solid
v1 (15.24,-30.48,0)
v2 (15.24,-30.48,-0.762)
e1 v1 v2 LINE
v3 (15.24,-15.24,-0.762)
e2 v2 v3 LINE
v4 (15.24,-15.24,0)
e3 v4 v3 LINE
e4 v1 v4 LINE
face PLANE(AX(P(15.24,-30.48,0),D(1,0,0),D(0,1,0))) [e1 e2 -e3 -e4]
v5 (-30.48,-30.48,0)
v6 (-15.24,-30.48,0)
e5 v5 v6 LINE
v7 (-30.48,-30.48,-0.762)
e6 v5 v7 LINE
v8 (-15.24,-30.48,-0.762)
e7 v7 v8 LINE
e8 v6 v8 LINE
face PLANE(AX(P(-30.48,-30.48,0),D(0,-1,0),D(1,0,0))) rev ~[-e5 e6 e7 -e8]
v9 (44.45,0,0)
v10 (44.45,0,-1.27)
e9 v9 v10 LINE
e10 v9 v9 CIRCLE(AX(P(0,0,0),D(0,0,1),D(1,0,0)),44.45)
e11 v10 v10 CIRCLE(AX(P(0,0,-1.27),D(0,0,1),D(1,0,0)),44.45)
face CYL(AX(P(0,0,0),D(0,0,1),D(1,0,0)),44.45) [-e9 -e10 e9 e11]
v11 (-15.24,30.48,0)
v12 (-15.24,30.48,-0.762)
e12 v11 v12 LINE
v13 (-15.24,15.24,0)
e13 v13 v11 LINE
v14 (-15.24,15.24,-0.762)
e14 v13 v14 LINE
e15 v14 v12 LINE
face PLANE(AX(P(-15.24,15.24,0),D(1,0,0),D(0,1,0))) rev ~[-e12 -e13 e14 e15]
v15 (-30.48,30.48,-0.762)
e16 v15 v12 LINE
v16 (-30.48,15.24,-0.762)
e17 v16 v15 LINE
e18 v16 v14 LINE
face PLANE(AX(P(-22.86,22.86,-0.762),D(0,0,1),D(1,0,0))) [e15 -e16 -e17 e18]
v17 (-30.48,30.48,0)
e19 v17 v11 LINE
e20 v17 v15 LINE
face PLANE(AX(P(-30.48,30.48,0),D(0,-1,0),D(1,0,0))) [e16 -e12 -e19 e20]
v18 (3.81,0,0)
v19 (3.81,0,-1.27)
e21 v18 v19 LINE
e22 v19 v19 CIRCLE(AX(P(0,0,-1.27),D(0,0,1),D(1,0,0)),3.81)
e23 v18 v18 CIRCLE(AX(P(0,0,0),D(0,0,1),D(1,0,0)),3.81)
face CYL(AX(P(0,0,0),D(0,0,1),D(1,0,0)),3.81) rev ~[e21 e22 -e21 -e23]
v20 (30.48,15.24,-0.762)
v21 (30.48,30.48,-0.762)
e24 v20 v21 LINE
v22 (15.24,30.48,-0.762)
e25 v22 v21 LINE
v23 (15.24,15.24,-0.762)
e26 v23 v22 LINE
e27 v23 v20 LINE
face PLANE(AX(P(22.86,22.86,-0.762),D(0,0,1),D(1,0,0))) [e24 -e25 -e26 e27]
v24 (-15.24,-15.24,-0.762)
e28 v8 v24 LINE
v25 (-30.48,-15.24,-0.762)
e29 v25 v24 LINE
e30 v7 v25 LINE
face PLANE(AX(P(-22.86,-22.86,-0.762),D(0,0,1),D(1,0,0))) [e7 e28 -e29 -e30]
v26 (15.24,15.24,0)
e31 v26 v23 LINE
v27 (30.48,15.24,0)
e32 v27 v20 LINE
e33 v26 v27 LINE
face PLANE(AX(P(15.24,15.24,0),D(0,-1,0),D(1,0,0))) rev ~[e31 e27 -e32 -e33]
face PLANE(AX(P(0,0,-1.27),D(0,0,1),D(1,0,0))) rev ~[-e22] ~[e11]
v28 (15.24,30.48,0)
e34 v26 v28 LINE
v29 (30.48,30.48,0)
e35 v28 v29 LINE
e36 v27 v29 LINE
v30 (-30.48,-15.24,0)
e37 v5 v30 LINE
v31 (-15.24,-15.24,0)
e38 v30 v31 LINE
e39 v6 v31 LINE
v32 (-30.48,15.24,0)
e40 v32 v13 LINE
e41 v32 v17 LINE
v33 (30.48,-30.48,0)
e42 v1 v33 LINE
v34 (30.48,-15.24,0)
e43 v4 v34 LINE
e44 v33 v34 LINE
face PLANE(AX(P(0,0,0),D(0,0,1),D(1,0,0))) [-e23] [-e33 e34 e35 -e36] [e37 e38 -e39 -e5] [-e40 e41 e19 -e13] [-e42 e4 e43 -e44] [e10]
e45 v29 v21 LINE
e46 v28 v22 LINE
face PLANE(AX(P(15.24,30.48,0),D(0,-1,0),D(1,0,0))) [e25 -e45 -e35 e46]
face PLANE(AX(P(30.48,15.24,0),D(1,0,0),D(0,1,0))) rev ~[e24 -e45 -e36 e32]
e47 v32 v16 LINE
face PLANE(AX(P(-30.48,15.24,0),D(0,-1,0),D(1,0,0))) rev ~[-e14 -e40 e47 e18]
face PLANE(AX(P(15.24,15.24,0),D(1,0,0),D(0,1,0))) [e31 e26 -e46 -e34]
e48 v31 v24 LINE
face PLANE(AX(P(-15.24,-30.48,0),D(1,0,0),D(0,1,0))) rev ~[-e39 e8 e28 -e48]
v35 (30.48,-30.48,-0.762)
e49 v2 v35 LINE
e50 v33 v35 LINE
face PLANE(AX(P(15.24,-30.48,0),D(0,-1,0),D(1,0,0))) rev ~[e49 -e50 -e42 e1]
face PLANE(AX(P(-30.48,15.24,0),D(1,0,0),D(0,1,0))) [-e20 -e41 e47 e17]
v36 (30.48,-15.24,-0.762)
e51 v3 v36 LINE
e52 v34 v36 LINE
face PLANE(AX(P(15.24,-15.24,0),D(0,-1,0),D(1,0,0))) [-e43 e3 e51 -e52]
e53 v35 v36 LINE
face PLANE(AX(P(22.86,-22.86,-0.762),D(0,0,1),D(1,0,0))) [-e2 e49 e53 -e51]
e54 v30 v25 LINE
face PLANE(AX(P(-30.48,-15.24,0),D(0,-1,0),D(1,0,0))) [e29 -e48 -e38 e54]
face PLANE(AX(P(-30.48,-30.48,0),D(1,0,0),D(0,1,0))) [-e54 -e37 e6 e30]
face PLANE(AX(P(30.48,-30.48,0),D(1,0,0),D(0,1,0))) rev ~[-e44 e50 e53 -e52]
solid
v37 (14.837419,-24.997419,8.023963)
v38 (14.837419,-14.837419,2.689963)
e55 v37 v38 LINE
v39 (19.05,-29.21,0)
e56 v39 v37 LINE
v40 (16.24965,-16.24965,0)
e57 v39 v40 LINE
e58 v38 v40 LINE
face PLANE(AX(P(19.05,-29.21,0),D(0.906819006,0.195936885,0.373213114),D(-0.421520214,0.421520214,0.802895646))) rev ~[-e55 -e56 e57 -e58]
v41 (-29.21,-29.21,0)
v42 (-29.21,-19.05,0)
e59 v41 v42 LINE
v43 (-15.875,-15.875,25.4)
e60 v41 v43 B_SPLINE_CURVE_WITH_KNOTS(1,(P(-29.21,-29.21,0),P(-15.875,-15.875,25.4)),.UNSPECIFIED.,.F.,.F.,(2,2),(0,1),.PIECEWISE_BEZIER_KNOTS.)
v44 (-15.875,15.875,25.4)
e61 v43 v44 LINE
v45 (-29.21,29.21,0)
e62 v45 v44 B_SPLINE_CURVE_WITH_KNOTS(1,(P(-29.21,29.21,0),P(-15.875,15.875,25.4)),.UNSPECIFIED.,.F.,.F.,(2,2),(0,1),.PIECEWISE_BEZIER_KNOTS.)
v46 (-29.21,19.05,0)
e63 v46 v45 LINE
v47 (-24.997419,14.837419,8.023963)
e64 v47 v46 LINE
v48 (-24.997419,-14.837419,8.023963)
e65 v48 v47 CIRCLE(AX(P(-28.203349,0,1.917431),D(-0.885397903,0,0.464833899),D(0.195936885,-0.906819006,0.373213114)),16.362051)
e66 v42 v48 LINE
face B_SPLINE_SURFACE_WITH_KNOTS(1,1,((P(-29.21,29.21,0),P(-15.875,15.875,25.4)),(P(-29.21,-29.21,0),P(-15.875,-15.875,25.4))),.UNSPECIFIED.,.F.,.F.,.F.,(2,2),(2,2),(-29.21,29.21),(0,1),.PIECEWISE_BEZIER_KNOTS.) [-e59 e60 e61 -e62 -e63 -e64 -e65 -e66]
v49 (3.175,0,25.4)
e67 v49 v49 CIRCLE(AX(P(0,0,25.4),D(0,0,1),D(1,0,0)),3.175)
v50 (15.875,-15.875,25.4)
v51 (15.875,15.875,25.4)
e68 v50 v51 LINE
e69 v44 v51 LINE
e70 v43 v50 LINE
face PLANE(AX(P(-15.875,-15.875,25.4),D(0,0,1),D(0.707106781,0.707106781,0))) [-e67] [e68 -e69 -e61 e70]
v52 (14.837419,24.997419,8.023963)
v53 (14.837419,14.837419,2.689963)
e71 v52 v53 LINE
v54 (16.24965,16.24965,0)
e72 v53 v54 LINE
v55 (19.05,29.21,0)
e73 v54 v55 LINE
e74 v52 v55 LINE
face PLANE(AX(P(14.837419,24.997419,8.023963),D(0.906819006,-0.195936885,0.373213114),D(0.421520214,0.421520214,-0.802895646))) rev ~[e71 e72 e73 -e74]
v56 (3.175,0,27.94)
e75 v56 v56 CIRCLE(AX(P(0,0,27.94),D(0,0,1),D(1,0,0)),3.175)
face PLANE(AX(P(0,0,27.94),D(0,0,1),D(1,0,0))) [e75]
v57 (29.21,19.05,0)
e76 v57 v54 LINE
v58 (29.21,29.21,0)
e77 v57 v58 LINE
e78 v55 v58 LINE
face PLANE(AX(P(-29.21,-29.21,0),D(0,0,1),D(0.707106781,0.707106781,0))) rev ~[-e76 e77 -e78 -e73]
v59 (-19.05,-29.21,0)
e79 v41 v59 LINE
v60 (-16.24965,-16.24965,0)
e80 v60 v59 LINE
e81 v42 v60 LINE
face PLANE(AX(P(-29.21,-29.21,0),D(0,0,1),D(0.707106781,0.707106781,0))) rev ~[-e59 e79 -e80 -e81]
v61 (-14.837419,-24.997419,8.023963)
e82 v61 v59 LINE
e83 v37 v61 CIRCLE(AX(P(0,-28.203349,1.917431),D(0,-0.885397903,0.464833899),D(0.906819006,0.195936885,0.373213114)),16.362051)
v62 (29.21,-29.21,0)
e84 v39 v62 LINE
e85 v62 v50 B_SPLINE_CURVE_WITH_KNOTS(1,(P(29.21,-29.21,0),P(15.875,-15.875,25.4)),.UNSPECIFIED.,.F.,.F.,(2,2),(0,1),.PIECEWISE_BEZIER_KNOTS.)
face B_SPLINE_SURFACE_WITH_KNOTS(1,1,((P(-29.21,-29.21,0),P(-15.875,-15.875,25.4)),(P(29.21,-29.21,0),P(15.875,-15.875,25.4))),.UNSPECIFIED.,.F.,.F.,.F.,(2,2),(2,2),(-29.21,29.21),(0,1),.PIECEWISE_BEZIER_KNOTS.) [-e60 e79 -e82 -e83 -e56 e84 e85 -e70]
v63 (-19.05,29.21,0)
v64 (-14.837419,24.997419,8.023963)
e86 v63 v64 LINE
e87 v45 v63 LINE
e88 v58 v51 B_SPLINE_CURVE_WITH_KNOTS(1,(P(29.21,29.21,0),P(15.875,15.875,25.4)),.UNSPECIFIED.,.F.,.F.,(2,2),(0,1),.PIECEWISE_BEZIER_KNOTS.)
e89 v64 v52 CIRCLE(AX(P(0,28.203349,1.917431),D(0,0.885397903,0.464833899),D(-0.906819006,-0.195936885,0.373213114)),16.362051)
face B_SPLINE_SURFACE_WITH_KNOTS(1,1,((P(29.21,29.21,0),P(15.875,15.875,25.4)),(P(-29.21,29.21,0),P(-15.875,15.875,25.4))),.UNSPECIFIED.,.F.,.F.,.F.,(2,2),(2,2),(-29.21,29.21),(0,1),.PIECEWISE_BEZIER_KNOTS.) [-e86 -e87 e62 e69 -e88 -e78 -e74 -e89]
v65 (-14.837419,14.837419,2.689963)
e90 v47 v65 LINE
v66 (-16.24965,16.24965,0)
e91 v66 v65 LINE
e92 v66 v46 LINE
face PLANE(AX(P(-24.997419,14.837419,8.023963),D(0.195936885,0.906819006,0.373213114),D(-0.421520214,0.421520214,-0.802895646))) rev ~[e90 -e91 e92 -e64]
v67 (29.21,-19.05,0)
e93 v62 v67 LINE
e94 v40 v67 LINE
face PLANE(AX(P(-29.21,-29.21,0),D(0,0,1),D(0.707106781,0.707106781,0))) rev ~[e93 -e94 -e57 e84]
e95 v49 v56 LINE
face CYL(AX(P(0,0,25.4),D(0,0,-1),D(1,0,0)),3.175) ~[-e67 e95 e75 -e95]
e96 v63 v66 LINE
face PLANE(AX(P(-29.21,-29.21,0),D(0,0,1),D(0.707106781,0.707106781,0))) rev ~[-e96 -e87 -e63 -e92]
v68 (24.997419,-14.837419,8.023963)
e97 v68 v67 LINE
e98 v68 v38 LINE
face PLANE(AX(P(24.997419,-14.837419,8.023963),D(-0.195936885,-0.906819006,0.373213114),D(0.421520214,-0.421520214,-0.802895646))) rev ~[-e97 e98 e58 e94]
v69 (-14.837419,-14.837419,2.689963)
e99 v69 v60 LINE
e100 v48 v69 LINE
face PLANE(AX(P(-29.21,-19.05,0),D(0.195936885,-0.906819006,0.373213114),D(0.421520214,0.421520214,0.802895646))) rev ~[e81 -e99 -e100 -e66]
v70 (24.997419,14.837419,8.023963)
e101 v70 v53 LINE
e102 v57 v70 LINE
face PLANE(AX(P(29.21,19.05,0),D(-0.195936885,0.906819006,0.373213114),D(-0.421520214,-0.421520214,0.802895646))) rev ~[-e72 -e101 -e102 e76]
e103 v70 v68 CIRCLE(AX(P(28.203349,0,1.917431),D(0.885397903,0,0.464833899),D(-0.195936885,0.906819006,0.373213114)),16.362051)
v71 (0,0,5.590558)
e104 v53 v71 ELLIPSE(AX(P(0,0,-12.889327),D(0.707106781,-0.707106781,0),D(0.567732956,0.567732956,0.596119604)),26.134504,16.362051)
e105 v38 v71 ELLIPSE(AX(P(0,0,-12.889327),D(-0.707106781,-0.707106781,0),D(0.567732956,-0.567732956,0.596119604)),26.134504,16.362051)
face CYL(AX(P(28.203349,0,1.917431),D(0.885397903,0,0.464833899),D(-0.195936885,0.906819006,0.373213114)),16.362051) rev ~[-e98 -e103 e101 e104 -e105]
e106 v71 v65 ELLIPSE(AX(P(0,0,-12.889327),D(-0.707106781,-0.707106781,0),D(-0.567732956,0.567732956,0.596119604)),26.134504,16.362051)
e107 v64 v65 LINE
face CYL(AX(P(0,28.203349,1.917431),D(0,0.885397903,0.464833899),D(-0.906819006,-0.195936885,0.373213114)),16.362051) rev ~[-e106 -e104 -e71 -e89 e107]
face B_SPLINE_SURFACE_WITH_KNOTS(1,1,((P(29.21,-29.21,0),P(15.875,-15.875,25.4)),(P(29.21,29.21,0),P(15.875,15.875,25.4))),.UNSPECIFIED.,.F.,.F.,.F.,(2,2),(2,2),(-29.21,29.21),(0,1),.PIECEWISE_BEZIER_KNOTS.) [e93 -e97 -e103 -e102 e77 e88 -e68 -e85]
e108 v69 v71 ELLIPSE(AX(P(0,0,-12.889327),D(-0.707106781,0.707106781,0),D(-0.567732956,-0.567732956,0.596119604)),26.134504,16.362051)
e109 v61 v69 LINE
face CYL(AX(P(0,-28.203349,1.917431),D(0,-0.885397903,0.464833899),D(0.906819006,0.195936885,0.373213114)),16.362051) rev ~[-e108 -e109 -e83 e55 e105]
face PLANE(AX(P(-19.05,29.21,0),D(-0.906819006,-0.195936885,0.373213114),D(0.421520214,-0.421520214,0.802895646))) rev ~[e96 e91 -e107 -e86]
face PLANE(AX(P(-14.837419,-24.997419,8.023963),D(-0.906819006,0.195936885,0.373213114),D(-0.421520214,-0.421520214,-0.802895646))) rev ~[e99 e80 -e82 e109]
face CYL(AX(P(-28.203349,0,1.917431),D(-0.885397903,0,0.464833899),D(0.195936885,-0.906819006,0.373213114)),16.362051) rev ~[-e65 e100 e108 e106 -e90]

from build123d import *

# Parameters (mm, degrees)
F0_R      = 44.45
F0_R_2    = 3.81
F1_DEPTH  = 1.27
F2_W      = 58.42
F2_H      = 58.42
F4_W      = 31.75
F4_H      = 31.75
F10_DEPTH = 141.478
F11_DEPTH = 70.866
F12_DEPTH = 64.516
F13_DEPTH = 65.278
F14_W     = 15.24
F14_H     = 15.24
F15_DEPTH = 0.762
F16_R     = 3.175
F17_DEPTH = 2.54


with BuildPart() as f1:
    # F0 (on Top) → F1 (new body)
    with BuildSketch(Plane.XY):
        Circle(F0_R)
        Circle(F0_R_2, mode=Mode.SUBTRACT)
    extrude(amount=-F1_DEPTH)

    # F14 (on face) → F15 (cut)
    with BuildSketch(Plane.XY):
        with Locations((-22.86, 22.86)):
            Rectangle(F14_W, F14_H)
        with Locations((22.86, 22.86)):
            Rectangle(F14_W, F14_H)
        with Locations((22.86, -22.86)):
            Rectangle(F14_W, F14_H)
        with Locations((-22.86, -22.86)):
            Rectangle(F14_W, F14_H)
    extrude(amount=-F15_DEPTH, mode=Mode.SUBTRACT)


with BuildPart() as f5:
    # F2 (on Top) → F5 section 0
    with BuildSketch(Plane.XY):
        Rectangle(F2_W, F2_H)
    # F4 (on offset) → F5 section 1
    with BuildSketch(Plane.XY.offset(25.4)):
        Rectangle(F4_W, F4_H)
    loft()

    # F7 (on face) → F10 (cut)
    with BuildSketch(Plane(origin=(-22.8985791279, 0, 12.0217540421), x_dir=(0, -1, 0), z_dir=(-0.8853979028, 0, 0.464833899))):
        with BuildLine():
            Line((-19.05, -13.5777981895), (19.05, -13.5777981895))
            Line((19.05, -13.5777981895), (14.8374191851, -4.5152474072))
            ThreePointArc((14.8374191851, -4.5152474072), (0, 4.9498685856), (-14.8374191851, -4.5152474072))
            Line((-14.8374191851, -4.5152474072), (-19.05, -13.5777981895))
        make_face()
    extrude(amount=-F10_DEPTH, mode=Mode.SUBTRACT)

    # F8 (on face) → F11 (cut)
    with BuildSketch(Plane(origin=(0, -22.8985791279, 12.0217540421), x_dir=(1, 0, 0), z_dir=(0, -0.8853979028, 0.464833899))):
        with BuildLine():
            Line((-14.8374191851, -4.5152474072), (-19.05, -13.5777981895))
            Line((-19.05, -13.5777981895), (19.05, -13.5777981895))
            Line((19.05, -13.5777981895), (14.8374191851, -4.5152474072))
            ThreePointArc((14.8374191851, -4.5152474072), (0, 4.9498685856), (-14.8374191851, -4.5152474072))
        make_face()
    extrude(amount=-F11_DEPTH, mode=Mode.SUBTRACT)

    # F9 (on face) → F12 (cut)
    with BuildSketch(Plane(origin=(22.8985791279, 0, 12.0217540421), x_dir=(0, 1, 0), z_dir=(0.8853979028, 0, 0.464833899))):
        with BuildLine():
            Line((-19.05, -13.5777981895), (19.05, -13.5777981895))
            Line((19.05, -13.5777981895), (14.8374191851, -4.5152474072))
            ThreePointArc((14.8374191851, -4.5152474072), (0, 4.9498685856), (-14.8374191851, -4.5152474072))
            Line((-14.8374191851, -4.5152474072), (-19.05, -13.5777981895))
        make_face()
    extrude(amount=-F12_DEPTH, mode=Mode.SUBTRACT)

    # F6 (on face) → F13 (cut)
    with BuildSketch(Plane(origin=(0, 22.8985791279, 12.0217540421), x_dir=(-1, 0, 0), z_dir=(0, 0.8853979028, 0.464833899))):
        with BuildLine():
            Line((-19.05, -13.5777981895), (19.05, -13.5777981895))
            Line((19.05, -13.5777981895), (14.8374191851, -4.5152474072))
            ThreePointArc((14.8374191851, -4.5152474072), (0, 4.9498685856), (-14.8374191851, -4.5152474072))
            Line((-14.8374191851, -4.5152474072), (-19.05, -13.5777981895))
        make_face()
    extrude(amount=-F13_DEPTH, mode=Mode.SUBTRACT)

    # F16 (on face) → F17 (join)
    with BuildSketch(Plane.XY.offset(25.4)):
        Circle(F16_R)
    extrude(amount=F17_DEPTH)


solid = Compound([f1.part, f5.part])
